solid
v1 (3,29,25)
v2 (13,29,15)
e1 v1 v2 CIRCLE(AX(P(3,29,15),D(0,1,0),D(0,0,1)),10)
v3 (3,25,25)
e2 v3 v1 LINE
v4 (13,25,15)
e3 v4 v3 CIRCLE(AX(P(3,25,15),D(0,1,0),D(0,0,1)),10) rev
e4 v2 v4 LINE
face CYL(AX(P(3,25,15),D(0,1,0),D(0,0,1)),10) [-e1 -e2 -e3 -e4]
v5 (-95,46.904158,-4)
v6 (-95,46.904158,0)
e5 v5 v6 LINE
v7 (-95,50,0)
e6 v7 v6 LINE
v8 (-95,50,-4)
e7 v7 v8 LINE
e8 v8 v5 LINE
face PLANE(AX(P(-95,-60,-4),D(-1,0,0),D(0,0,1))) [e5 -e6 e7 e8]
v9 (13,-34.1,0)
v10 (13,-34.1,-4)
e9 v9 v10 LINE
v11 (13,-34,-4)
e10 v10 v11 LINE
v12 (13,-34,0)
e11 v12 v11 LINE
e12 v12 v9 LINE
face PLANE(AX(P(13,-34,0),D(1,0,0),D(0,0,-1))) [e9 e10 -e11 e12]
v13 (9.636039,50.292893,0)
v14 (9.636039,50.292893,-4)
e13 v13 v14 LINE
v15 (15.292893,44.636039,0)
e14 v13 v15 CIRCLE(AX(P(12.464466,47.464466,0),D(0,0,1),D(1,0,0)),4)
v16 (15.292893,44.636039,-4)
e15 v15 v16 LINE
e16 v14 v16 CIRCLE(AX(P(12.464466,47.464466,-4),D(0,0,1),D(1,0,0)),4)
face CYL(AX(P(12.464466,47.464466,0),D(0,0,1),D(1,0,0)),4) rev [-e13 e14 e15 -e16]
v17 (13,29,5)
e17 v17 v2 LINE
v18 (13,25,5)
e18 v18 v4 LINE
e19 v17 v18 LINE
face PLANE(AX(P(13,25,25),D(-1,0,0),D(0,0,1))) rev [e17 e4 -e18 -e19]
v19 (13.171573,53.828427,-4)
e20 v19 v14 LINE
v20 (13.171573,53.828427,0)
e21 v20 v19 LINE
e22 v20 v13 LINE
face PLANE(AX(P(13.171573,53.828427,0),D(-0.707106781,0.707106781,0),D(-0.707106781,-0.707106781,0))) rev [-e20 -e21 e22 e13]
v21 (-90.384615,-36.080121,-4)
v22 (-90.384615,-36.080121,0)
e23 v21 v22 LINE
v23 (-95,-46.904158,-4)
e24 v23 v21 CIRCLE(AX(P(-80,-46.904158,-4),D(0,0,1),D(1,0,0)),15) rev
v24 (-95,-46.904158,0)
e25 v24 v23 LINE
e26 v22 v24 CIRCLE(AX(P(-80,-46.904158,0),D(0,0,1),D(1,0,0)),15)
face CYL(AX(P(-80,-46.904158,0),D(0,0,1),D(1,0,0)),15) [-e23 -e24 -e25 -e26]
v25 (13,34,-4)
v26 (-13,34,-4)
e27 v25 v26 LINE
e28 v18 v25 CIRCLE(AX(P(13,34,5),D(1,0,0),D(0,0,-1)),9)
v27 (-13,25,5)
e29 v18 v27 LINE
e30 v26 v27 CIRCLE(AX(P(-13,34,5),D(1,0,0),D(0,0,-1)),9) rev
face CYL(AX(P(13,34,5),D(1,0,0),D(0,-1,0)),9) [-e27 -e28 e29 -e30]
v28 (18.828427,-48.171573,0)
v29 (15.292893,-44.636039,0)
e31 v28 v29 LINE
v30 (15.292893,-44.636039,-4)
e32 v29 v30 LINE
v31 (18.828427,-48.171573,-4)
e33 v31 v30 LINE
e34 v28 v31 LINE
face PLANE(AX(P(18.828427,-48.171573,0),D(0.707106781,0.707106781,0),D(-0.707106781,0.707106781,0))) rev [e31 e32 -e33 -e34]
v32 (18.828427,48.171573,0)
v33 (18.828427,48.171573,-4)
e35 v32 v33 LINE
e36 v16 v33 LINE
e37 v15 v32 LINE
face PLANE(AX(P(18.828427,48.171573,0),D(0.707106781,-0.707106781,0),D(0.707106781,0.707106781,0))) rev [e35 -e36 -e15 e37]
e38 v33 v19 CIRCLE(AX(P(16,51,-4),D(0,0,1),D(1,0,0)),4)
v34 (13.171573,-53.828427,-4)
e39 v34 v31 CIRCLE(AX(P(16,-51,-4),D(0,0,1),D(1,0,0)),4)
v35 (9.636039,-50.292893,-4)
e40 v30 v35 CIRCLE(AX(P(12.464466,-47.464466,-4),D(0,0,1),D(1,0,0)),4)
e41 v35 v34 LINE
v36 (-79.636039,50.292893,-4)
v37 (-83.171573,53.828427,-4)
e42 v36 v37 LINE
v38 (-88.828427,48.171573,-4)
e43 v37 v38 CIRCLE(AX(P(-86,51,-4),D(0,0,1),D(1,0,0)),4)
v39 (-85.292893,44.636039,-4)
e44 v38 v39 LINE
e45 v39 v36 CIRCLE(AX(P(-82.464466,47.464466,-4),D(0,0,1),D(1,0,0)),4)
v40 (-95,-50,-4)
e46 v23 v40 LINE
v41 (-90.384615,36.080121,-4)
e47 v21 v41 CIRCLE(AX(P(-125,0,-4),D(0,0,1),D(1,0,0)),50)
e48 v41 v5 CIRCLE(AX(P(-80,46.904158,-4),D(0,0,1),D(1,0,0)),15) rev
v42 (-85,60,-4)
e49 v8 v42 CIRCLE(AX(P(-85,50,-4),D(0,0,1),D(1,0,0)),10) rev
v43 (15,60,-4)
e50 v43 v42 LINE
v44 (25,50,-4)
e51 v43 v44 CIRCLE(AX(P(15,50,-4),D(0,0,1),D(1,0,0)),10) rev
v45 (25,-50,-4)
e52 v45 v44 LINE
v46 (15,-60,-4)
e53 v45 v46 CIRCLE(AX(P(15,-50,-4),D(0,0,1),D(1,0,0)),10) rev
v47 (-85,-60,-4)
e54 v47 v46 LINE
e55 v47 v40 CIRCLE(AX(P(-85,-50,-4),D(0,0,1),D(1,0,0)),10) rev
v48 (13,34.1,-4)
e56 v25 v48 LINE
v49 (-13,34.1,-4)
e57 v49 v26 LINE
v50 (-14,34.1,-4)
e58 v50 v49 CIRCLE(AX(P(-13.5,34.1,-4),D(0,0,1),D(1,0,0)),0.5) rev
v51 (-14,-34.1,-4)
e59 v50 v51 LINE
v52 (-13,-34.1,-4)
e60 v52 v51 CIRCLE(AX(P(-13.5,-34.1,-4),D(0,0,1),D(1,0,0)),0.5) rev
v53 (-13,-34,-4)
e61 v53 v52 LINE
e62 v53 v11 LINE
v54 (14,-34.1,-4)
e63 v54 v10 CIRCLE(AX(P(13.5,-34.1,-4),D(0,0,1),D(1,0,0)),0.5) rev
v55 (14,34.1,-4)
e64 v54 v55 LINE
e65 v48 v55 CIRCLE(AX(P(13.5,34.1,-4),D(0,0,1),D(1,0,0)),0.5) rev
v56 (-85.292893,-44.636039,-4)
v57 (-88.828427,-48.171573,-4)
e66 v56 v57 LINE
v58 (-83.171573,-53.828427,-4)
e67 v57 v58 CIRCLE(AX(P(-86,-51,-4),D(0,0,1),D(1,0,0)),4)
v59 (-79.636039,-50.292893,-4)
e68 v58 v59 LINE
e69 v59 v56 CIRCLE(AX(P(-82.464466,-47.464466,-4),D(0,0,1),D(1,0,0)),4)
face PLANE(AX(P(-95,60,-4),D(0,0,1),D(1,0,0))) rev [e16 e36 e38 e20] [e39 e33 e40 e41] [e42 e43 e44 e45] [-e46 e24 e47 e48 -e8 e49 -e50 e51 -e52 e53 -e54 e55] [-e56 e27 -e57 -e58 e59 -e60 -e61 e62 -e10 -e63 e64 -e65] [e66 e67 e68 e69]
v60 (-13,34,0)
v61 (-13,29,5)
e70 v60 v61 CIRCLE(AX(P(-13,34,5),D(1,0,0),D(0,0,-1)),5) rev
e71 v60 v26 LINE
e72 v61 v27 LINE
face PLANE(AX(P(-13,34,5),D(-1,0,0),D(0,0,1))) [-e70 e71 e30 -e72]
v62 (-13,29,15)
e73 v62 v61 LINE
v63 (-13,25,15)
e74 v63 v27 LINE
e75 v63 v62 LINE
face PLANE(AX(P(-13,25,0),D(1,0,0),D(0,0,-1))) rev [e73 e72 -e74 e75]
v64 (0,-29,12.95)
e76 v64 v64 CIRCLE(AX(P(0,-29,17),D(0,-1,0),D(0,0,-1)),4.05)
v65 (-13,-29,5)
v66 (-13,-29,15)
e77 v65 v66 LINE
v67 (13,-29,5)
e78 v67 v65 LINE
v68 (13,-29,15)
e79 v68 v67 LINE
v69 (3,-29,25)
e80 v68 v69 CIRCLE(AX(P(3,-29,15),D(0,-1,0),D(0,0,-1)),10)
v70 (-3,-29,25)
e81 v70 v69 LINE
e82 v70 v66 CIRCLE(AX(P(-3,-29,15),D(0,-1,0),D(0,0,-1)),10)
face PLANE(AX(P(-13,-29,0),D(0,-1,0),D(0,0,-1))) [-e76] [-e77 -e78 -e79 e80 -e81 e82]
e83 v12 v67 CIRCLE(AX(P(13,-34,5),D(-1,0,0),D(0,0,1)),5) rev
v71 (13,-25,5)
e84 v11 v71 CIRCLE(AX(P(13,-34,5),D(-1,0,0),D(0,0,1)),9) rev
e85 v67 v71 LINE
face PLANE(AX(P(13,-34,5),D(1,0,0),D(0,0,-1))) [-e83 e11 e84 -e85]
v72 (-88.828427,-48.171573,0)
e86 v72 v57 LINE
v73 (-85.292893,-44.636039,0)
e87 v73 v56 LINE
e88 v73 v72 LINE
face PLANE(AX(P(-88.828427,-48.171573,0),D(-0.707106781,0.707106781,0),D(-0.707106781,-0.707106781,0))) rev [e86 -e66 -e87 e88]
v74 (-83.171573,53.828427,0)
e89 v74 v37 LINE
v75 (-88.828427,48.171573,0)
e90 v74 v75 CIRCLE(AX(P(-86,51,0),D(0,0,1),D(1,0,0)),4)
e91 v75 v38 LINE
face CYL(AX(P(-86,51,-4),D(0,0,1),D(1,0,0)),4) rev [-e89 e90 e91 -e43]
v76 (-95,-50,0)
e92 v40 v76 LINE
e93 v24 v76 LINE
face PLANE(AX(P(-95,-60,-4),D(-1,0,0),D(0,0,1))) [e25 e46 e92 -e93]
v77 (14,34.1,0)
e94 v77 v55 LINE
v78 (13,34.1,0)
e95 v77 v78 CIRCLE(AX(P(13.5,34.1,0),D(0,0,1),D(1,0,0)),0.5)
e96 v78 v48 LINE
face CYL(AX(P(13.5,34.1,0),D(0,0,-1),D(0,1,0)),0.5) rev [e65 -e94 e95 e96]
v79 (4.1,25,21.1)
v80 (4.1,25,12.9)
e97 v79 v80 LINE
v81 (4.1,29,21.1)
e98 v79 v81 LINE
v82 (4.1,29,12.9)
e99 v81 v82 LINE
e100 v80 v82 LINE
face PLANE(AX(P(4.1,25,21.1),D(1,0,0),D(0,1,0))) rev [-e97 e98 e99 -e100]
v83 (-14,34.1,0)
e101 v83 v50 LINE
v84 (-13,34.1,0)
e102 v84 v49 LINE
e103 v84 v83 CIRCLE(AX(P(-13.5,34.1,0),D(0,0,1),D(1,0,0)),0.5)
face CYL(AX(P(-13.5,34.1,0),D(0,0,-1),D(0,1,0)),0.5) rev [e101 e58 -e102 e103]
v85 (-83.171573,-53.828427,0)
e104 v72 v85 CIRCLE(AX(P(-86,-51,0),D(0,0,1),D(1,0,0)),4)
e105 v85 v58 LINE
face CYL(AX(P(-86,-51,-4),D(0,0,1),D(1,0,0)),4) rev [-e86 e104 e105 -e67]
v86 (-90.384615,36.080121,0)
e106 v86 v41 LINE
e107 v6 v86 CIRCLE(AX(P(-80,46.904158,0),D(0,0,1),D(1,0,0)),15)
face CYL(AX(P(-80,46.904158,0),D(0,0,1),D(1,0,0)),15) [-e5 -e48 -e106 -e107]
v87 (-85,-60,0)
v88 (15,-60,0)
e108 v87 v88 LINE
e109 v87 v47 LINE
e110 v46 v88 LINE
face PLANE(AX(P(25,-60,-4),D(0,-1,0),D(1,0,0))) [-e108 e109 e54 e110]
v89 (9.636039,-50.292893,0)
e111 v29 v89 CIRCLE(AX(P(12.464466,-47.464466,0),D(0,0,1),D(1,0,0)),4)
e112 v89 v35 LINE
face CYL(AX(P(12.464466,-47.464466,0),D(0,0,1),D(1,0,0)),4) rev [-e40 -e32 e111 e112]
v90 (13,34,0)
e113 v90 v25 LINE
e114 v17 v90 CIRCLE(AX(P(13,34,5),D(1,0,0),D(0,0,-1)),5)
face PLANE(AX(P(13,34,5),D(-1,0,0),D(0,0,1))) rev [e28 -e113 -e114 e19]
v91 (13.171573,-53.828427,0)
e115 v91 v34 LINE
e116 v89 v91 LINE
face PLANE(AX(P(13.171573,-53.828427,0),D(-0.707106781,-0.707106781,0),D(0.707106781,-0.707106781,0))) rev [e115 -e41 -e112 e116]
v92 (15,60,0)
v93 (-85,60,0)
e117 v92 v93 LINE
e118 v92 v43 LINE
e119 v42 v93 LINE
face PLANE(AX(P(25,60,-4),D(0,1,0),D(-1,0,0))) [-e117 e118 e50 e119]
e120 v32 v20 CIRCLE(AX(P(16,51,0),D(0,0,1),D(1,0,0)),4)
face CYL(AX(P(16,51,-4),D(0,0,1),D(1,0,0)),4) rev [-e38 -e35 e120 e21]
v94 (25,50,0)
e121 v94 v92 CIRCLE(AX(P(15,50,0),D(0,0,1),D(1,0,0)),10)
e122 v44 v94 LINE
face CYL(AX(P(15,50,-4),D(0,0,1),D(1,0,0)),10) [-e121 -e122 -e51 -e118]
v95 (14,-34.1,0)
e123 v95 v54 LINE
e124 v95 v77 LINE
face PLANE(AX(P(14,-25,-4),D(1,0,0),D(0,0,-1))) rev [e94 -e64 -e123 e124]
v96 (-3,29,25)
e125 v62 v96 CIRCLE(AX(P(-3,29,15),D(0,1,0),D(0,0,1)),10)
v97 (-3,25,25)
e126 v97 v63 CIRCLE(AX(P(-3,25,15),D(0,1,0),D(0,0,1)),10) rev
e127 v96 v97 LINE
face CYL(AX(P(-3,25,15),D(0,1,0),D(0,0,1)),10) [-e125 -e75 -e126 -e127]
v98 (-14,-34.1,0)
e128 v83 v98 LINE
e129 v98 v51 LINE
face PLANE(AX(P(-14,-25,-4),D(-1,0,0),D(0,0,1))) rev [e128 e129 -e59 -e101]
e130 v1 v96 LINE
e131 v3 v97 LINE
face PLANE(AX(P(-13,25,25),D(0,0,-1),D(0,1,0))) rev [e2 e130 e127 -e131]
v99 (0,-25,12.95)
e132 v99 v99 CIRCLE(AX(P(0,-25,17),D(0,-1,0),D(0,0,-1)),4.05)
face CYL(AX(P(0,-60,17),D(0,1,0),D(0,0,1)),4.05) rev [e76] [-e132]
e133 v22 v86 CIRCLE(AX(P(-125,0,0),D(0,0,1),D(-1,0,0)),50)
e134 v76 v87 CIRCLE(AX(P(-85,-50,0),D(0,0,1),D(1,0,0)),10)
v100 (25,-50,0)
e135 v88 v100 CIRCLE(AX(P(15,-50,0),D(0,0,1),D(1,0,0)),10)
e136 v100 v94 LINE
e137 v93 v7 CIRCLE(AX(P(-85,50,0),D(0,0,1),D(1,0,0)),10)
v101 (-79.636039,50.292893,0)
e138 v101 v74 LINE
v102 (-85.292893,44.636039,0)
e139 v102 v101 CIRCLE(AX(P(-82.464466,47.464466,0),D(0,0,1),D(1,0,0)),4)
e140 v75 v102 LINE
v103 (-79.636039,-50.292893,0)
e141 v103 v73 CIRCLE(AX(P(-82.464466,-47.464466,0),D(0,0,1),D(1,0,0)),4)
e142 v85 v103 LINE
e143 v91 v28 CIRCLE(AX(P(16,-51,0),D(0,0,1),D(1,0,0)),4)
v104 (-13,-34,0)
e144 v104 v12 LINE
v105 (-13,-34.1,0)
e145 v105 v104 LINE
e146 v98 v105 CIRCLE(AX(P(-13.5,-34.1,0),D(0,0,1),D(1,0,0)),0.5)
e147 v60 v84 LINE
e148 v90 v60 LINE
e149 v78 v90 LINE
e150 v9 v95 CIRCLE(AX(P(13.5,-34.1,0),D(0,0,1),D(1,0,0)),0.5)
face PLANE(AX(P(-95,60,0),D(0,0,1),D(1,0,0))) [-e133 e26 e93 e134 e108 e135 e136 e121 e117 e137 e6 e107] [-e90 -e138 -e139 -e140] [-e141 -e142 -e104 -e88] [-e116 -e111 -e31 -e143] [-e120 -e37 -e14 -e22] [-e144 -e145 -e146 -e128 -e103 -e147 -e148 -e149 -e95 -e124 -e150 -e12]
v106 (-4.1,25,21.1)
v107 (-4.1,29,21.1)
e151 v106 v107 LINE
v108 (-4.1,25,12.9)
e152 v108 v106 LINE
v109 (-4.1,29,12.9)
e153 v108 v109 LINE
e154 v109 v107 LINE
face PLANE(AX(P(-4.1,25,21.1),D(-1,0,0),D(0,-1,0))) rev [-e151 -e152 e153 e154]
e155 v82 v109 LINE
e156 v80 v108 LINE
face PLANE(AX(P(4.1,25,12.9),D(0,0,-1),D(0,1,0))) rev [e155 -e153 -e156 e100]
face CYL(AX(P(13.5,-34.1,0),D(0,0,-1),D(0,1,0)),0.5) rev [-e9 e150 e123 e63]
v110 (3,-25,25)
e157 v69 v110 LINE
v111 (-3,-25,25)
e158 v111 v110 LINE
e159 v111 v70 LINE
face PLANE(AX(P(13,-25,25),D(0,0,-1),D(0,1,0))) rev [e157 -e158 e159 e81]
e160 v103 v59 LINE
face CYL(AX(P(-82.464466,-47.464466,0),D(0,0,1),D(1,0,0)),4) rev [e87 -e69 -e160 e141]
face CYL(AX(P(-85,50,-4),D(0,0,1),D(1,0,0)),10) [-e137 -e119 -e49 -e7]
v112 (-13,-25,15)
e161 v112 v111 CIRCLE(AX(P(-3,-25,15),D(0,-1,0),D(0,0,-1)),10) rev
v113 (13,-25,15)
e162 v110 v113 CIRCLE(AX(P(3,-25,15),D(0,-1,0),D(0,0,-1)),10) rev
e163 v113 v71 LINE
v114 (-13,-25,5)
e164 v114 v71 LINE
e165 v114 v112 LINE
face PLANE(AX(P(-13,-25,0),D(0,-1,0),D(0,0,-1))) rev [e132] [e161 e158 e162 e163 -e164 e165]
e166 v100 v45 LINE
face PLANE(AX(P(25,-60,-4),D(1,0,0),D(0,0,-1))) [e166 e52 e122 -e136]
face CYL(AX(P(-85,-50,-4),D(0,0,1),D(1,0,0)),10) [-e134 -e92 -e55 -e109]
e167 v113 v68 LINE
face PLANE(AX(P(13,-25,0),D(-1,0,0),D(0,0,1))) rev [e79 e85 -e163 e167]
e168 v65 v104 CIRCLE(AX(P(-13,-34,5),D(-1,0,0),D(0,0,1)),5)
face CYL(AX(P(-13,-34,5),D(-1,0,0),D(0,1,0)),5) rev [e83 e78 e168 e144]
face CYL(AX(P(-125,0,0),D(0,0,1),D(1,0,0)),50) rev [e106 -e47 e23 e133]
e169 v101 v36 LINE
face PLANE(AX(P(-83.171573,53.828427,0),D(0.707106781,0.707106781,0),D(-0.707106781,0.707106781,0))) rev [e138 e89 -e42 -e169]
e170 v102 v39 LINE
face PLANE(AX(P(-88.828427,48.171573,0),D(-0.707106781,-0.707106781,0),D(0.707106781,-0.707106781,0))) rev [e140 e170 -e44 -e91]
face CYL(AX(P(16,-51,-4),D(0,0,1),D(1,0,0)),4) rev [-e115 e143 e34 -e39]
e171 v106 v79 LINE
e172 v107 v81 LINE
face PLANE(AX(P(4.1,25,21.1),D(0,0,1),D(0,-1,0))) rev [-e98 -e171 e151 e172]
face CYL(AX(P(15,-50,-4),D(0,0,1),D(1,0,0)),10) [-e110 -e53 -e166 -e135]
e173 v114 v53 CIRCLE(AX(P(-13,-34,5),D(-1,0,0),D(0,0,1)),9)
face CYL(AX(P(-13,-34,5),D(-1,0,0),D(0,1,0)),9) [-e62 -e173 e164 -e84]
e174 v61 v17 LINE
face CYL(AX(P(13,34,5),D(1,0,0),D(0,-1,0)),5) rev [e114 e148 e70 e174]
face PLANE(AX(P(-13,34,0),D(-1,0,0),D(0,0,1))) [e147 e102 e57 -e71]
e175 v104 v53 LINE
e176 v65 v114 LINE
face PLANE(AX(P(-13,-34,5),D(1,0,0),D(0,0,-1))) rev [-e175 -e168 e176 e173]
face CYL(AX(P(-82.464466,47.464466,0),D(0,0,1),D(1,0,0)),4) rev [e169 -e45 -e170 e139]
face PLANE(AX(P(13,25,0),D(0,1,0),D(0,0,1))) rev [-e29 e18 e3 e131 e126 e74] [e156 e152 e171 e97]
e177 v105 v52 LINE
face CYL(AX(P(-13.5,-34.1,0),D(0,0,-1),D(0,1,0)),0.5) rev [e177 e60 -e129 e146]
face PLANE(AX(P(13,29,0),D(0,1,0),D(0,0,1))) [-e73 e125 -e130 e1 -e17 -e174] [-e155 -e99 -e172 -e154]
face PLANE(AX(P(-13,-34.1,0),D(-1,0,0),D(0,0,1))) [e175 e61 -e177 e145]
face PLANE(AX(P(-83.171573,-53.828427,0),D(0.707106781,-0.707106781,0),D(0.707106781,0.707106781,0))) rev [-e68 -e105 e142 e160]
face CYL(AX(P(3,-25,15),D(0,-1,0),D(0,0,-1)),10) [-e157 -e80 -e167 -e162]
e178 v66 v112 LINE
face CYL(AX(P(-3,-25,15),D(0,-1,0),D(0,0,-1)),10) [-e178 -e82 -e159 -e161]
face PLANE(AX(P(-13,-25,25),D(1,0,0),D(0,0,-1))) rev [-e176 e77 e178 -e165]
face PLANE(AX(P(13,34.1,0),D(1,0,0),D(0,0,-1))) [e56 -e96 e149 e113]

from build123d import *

# Parameters (mm, degrees)
SKETCH_1_W           = 120
SKETCH_1_H           = 120
SKETCH_1_W_2         = 28
SKETCH_1_H_2         = 50
BASE_PLATE_DEPTH     = 4
TABS2_START          = -5
TABS2_DEPTH          = 10
TABS2_2_OUTLINE_W    = 26
TABS2_2_OUTLINE_H    = 4
TABS2_2_DEPTH        = 1.41096
TABS2_START_2        = 5
TABS2_3_OUTLINE_W    = 26
TABS2_3_OUTLINE_H    = 4
TABS2_3_DEPTH        = 20
TABS2_START_3        = -13
TABS2_4_DEPTH        = 26
TABS2_5_DEPTH        = 26
HOLE1_DEPTH          = 116.108644332
HOLE1_DEPTH_BACK     = 116.108644332
SKETCH_10_R          = 4.05
SKETCH_12_W          = 8.2
SKETCH_12_H          = 8.2
HOLE2_DEPTH          = 4
FILLETS_R            = 10
SKETCH_11_R          = 4
OBLONG_HOLES_DEPTH   = 4
OBLONG_HOLES_2_DEPTH = 4
FILLETS2_DEPTH       = 4
FILLETS3_R           = 15


with BuildPart() as part:
    # Base Plate: sheet metal written as solids
    # Sketch 1 → Base Plate (new body)
    with BuildSketch(Plane.XY):
        with Locations((-35, 0)):
            Rectangle(SKETCH_1_W, SKETCH_1_H)
        Rectangle(SKETCH_1_W_2, SKETCH_1_H_2, mode=Mode.SUBTRACT)
    extrude(amount=-BASE_PLATE_DEPTH)

    # Tabs2: read off the stored shape, not the designer's step
    # Tabs2 outline → Tabs2 (cut)
    with BuildSketch(Plane.XY.offset(TABS2_START)):
        with BuildLine():
            ThreePointArc((-13, 34.1), (-13.5, 34.6), (-14, 34.1))
            Line((-14, 34.1), (-14, 25))
            Line((-14, 25), (-13, 25))
            Line((-13, 25), (-13, 34.1))
        make_face()
        with BuildLine():
            Line((-13, -25), (-14, -25))
            Line((-14, -25), (-14, -34.1))
            ThreePointArc((-14, -34.1), (-13.5, -34.6), (-13, -34.1))
            Line((-13, -34.1), (-13, -25))
        make_face()
        with BuildLine():
            Line((13, 34.1), (13, 25))
            Line((13, 25), (14, 25))
            Line((14, 25), (14, 34.1))
            ThreePointArc((14, 34.1), (13.5, 34.6), (13, 34.1))
        make_face()
        with BuildLine():
            Line((14, -25), (13, -25))
            Line((13, -25), (13, -34.1))
            ThreePointArc((13, -34.1), (13.5, -34.6), (14, -34.1))
            Line((14, -34.1), (14, -25))
        make_face()
    extrude(amount=TABS2_DEPTH, mode=Mode.SUBTRACT)

    # Tabs2 2 outline → Tabs2 2 (cut)
    with BuildSketch(Plane.XY.offset(TABS2_START)):
        with Locations((0, 27)):
            Rectangle(TABS2_2_OUTLINE_W, TABS2_2_OUTLINE_H)
        with Locations((0, -27)):
            Rectangle(TABS2_2_OUTLINE_W, TABS2_2_OUTLINE_H)
    extrude(amount=TABS2_2_DEPTH, mode=Mode.SUBTRACT)

    # Tabs2 4 outline → Tabs2 4 (cut)
    with BuildSketch(Plane.YZ.offset(TABS2_START_3)):
        with BuildLine():
            ThreePointArc((34, -4), (29.757359313, -2.937253933), (26.516685226, 0))
            Line((26.516685226, 0), (25, 0))
            Line((25, 0), (25, -3.58904))
            Line((25, -3.58904), (29, -3.58904))
            Line((29, -3.58904), (29, -4))
            Line((29, -4), (34, -4))
        make_face()
        with BuildLine():
            Line((-25, -3.58904), (-25, 0))
            Line((-25, 0), (-26.516685226, 0))
            ThreePointArc((-26.516685226, 0), (-29.757359313, -2.937253933), (-34, -4))
            Line((-34, -4), (-29, -4))
            Line((-29, -4), (-29, -3.58904))
            Line((-29, -3.58904), (-25, -3.58904))
        make_face()
    extrude(amount=TABS2_4_DEPTH, mode=Mode.SUBTRACT)



with BuildPart() as body_2:
    # Tabs2 3 outline → Tabs2 3 (new body)
    with BuildSketch(Plane.XY.offset(TABS2_START_2)):
        with Locations((0, 27)):
            Rectangle(TABS2_3_OUTLINE_W, TABS2_3_OUTLINE_H)
        with Locations((0, -27)):
            Rectangle(TABS2_3_OUTLINE_W, TABS2_3_OUTLINE_H)
    extrude(amount=TABS2_3_DEPTH)


with BuildPart() as part_1:
    add(part.part)

    add(body_2.part)  # Tabs2 5 merges body 2
    # Tabs2 5 outline → Tabs2 5 (add)
    with BuildSketch(Plane.YZ.offset(TABS2_START_3)):
        with BuildLine():
            Line((29, 5), (25, 5))
            ThreePointArc((25, 5), (25.38751392, 2.38751392), (26.516685226, 0))
            Line((26.516685226, 0), (34, 0))
            ThreePointArc((34, 0), (30.464466094, 1.464466094), (29, 5))
        make_face()
        with BuildLine():
            Line((-34, 0), (-26.516685226, 0))
            ThreePointArc((-26.516685226, 0), (-25.38751392, 2.38751392), (-25, 5))
            Line((-25, 5), (-29, 5))
            ThreePointArc((-29, 5), (-30.464466094, 1.464466094), (-34, 0))
        make_face()
    extrude(amount=TABS2_5_DEPTH)

    # Эскиз10 → Hole1 (cut, two sides: drawn at the far end of the back side and taken through both)
    with BuildSketch(Plane(origin=(0, 0, 0), x_dir=(1, 0, 0), z_dir=(0, 1, 0)).offset(-HOLE1_DEPTH_BACK)):
        with Locations(Location((0, -17, 0), (0, 0, 90))):
            Circle(SKETCH_10_R)
    extrude(amount=HOLE1_DEPTH + HOLE1_DEPTH_BACK, mode=Mode.SUBTRACT)

    # Эскиз12 → Hole2 (cut)
    with BuildSketch(Plane(origin=(0, 29, 0), x_dir=(1, 0, 0), z_dir=(0, 1, 0))):
        with Locations((0, -17)):
            Rectangle(SKETCH_12_W, SKETCH_12_H)
    extrude(amount=-HOLE2_DEPTH, mode=Mode.SUBTRACT)

    # Fillets
    fillets_edges = [part_1.edges().sort_by_distance(p)[0] for p in [
        (13, -27, 25),
        (-13, -27, 25),
        (-95, 60, -2),
        (25, 60, -2),
        (25, -60, -2),
        (-95, -60, -2),
        (-13, 27, 25),
        (13, 27, 25),
    ]]
    fillet(fillets_edges, radius=FILLETS_R)

    # Эскиз11 → Oblong Holes (cut)
    with BuildSketch(Plane.XY):
        with Locations((-86, 51)):
            Circle(SKETCH_11_R)
        with Locations((16, 51)):
            Circle(SKETCH_11_R)
        with Locations((-86, -51)):
            Circle(SKETCH_11_R)
        with Locations((16, -51)):
            Circle(SKETCH_11_R)
    extrude(amount=-OBLONG_HOLES_DEPTH, mode=Mode.SUBTRACT)

    # Эскиз13 → oblong Holes 2 (cut)
    with BuildSketch(Plane.XY):
        with BuildLine():
            Line((-83.171572875, 53.828427125), (-79.636038969, 50.292893219))
            ThreePointArc((-79.636038969, 50.292893219), (-79.636038969, 44.636038969), (-85.292893219, 44.636038969))
            Line((-85.292893219, 44.636038969), (-88.828427125, 48.171572875))
            ThreePointArc((-88.828427125, 48.171572875), (-88.828427125, 53.828427125), (-83.171572875, 53.828427125))
        make_face()
        with BuildLine():
            Line((18.828427125, 48.171572875), (15.292893219, 44.636038969))
            ThreePointArc((15.292893219, 44.636038969), (9.636038969, 44.636038969), (9.636038969, 50.292893219))
            Line((9.636038969, 50.292893219), (13.171572875, 53.828427125))
            ThreePointArc((13.171572875, 53.828427125), (18.828427125, 53.828427125), (18.828427125, 48.171572875))
        make_face()
        with BuildLine():
            Line((-88.828427125, -48.171572875), (-85.292893219, -44.636038969))
            ThreePointArc((-85.292893219, -44.636038969), (-79.636038969, -44.636038969), (-79.636038969, -50.292893219))
            Line((-79.636038969, -50.292893219), (-83.171572875, -53.828427125))
            ThreePointArc((-83.171572875, -53.828427125), (-88.828427125, -53.828427125), (-88.828427125, -48.171572875))
        make_face()
        with BuildLine():
            Line((13.171572875, -53.828427125), (9.636038969, -50.292893219))
            ThreePointArc((9.636038969, -50.292893219), (9.636038969, -44.636038969), (15.292893219, -44.636038969))
            Line((15.292893219, -44.636038969), (18.828427125, -48.171572875))
            ThreePointArc((18.828427125, -48.171572875), (18.828427125, -53.828427125), (13.171572875, -53.828427125))
        make_face()
    extrude(amount=-OBLONG_HOLES_2_DEPTH, mode=Mode.SUBTRACT)

    # Эскиз14 → Fillets2 (cut)
    with BuildSketch(Plane.XY):
        with BuildLine():
            Line((-95, 40), (-95, -40))
            ThreePointArc((-95, -40), (-75, 0), (-95, 40))
        make_face()
    extrude(amount=-FILLETS2_DEPTH, mode=Mode.SUBTRACT)

    # Fillets3
    fillets3_edges = [part_1.edges().sort_by_distance(p)[0] for p in [
        (-95, 40, -2),
        (-95, -40, -2),
    ]]
    fillet(fillets3_edges, radius=FILLETS3_R)


solid = part_1.part
